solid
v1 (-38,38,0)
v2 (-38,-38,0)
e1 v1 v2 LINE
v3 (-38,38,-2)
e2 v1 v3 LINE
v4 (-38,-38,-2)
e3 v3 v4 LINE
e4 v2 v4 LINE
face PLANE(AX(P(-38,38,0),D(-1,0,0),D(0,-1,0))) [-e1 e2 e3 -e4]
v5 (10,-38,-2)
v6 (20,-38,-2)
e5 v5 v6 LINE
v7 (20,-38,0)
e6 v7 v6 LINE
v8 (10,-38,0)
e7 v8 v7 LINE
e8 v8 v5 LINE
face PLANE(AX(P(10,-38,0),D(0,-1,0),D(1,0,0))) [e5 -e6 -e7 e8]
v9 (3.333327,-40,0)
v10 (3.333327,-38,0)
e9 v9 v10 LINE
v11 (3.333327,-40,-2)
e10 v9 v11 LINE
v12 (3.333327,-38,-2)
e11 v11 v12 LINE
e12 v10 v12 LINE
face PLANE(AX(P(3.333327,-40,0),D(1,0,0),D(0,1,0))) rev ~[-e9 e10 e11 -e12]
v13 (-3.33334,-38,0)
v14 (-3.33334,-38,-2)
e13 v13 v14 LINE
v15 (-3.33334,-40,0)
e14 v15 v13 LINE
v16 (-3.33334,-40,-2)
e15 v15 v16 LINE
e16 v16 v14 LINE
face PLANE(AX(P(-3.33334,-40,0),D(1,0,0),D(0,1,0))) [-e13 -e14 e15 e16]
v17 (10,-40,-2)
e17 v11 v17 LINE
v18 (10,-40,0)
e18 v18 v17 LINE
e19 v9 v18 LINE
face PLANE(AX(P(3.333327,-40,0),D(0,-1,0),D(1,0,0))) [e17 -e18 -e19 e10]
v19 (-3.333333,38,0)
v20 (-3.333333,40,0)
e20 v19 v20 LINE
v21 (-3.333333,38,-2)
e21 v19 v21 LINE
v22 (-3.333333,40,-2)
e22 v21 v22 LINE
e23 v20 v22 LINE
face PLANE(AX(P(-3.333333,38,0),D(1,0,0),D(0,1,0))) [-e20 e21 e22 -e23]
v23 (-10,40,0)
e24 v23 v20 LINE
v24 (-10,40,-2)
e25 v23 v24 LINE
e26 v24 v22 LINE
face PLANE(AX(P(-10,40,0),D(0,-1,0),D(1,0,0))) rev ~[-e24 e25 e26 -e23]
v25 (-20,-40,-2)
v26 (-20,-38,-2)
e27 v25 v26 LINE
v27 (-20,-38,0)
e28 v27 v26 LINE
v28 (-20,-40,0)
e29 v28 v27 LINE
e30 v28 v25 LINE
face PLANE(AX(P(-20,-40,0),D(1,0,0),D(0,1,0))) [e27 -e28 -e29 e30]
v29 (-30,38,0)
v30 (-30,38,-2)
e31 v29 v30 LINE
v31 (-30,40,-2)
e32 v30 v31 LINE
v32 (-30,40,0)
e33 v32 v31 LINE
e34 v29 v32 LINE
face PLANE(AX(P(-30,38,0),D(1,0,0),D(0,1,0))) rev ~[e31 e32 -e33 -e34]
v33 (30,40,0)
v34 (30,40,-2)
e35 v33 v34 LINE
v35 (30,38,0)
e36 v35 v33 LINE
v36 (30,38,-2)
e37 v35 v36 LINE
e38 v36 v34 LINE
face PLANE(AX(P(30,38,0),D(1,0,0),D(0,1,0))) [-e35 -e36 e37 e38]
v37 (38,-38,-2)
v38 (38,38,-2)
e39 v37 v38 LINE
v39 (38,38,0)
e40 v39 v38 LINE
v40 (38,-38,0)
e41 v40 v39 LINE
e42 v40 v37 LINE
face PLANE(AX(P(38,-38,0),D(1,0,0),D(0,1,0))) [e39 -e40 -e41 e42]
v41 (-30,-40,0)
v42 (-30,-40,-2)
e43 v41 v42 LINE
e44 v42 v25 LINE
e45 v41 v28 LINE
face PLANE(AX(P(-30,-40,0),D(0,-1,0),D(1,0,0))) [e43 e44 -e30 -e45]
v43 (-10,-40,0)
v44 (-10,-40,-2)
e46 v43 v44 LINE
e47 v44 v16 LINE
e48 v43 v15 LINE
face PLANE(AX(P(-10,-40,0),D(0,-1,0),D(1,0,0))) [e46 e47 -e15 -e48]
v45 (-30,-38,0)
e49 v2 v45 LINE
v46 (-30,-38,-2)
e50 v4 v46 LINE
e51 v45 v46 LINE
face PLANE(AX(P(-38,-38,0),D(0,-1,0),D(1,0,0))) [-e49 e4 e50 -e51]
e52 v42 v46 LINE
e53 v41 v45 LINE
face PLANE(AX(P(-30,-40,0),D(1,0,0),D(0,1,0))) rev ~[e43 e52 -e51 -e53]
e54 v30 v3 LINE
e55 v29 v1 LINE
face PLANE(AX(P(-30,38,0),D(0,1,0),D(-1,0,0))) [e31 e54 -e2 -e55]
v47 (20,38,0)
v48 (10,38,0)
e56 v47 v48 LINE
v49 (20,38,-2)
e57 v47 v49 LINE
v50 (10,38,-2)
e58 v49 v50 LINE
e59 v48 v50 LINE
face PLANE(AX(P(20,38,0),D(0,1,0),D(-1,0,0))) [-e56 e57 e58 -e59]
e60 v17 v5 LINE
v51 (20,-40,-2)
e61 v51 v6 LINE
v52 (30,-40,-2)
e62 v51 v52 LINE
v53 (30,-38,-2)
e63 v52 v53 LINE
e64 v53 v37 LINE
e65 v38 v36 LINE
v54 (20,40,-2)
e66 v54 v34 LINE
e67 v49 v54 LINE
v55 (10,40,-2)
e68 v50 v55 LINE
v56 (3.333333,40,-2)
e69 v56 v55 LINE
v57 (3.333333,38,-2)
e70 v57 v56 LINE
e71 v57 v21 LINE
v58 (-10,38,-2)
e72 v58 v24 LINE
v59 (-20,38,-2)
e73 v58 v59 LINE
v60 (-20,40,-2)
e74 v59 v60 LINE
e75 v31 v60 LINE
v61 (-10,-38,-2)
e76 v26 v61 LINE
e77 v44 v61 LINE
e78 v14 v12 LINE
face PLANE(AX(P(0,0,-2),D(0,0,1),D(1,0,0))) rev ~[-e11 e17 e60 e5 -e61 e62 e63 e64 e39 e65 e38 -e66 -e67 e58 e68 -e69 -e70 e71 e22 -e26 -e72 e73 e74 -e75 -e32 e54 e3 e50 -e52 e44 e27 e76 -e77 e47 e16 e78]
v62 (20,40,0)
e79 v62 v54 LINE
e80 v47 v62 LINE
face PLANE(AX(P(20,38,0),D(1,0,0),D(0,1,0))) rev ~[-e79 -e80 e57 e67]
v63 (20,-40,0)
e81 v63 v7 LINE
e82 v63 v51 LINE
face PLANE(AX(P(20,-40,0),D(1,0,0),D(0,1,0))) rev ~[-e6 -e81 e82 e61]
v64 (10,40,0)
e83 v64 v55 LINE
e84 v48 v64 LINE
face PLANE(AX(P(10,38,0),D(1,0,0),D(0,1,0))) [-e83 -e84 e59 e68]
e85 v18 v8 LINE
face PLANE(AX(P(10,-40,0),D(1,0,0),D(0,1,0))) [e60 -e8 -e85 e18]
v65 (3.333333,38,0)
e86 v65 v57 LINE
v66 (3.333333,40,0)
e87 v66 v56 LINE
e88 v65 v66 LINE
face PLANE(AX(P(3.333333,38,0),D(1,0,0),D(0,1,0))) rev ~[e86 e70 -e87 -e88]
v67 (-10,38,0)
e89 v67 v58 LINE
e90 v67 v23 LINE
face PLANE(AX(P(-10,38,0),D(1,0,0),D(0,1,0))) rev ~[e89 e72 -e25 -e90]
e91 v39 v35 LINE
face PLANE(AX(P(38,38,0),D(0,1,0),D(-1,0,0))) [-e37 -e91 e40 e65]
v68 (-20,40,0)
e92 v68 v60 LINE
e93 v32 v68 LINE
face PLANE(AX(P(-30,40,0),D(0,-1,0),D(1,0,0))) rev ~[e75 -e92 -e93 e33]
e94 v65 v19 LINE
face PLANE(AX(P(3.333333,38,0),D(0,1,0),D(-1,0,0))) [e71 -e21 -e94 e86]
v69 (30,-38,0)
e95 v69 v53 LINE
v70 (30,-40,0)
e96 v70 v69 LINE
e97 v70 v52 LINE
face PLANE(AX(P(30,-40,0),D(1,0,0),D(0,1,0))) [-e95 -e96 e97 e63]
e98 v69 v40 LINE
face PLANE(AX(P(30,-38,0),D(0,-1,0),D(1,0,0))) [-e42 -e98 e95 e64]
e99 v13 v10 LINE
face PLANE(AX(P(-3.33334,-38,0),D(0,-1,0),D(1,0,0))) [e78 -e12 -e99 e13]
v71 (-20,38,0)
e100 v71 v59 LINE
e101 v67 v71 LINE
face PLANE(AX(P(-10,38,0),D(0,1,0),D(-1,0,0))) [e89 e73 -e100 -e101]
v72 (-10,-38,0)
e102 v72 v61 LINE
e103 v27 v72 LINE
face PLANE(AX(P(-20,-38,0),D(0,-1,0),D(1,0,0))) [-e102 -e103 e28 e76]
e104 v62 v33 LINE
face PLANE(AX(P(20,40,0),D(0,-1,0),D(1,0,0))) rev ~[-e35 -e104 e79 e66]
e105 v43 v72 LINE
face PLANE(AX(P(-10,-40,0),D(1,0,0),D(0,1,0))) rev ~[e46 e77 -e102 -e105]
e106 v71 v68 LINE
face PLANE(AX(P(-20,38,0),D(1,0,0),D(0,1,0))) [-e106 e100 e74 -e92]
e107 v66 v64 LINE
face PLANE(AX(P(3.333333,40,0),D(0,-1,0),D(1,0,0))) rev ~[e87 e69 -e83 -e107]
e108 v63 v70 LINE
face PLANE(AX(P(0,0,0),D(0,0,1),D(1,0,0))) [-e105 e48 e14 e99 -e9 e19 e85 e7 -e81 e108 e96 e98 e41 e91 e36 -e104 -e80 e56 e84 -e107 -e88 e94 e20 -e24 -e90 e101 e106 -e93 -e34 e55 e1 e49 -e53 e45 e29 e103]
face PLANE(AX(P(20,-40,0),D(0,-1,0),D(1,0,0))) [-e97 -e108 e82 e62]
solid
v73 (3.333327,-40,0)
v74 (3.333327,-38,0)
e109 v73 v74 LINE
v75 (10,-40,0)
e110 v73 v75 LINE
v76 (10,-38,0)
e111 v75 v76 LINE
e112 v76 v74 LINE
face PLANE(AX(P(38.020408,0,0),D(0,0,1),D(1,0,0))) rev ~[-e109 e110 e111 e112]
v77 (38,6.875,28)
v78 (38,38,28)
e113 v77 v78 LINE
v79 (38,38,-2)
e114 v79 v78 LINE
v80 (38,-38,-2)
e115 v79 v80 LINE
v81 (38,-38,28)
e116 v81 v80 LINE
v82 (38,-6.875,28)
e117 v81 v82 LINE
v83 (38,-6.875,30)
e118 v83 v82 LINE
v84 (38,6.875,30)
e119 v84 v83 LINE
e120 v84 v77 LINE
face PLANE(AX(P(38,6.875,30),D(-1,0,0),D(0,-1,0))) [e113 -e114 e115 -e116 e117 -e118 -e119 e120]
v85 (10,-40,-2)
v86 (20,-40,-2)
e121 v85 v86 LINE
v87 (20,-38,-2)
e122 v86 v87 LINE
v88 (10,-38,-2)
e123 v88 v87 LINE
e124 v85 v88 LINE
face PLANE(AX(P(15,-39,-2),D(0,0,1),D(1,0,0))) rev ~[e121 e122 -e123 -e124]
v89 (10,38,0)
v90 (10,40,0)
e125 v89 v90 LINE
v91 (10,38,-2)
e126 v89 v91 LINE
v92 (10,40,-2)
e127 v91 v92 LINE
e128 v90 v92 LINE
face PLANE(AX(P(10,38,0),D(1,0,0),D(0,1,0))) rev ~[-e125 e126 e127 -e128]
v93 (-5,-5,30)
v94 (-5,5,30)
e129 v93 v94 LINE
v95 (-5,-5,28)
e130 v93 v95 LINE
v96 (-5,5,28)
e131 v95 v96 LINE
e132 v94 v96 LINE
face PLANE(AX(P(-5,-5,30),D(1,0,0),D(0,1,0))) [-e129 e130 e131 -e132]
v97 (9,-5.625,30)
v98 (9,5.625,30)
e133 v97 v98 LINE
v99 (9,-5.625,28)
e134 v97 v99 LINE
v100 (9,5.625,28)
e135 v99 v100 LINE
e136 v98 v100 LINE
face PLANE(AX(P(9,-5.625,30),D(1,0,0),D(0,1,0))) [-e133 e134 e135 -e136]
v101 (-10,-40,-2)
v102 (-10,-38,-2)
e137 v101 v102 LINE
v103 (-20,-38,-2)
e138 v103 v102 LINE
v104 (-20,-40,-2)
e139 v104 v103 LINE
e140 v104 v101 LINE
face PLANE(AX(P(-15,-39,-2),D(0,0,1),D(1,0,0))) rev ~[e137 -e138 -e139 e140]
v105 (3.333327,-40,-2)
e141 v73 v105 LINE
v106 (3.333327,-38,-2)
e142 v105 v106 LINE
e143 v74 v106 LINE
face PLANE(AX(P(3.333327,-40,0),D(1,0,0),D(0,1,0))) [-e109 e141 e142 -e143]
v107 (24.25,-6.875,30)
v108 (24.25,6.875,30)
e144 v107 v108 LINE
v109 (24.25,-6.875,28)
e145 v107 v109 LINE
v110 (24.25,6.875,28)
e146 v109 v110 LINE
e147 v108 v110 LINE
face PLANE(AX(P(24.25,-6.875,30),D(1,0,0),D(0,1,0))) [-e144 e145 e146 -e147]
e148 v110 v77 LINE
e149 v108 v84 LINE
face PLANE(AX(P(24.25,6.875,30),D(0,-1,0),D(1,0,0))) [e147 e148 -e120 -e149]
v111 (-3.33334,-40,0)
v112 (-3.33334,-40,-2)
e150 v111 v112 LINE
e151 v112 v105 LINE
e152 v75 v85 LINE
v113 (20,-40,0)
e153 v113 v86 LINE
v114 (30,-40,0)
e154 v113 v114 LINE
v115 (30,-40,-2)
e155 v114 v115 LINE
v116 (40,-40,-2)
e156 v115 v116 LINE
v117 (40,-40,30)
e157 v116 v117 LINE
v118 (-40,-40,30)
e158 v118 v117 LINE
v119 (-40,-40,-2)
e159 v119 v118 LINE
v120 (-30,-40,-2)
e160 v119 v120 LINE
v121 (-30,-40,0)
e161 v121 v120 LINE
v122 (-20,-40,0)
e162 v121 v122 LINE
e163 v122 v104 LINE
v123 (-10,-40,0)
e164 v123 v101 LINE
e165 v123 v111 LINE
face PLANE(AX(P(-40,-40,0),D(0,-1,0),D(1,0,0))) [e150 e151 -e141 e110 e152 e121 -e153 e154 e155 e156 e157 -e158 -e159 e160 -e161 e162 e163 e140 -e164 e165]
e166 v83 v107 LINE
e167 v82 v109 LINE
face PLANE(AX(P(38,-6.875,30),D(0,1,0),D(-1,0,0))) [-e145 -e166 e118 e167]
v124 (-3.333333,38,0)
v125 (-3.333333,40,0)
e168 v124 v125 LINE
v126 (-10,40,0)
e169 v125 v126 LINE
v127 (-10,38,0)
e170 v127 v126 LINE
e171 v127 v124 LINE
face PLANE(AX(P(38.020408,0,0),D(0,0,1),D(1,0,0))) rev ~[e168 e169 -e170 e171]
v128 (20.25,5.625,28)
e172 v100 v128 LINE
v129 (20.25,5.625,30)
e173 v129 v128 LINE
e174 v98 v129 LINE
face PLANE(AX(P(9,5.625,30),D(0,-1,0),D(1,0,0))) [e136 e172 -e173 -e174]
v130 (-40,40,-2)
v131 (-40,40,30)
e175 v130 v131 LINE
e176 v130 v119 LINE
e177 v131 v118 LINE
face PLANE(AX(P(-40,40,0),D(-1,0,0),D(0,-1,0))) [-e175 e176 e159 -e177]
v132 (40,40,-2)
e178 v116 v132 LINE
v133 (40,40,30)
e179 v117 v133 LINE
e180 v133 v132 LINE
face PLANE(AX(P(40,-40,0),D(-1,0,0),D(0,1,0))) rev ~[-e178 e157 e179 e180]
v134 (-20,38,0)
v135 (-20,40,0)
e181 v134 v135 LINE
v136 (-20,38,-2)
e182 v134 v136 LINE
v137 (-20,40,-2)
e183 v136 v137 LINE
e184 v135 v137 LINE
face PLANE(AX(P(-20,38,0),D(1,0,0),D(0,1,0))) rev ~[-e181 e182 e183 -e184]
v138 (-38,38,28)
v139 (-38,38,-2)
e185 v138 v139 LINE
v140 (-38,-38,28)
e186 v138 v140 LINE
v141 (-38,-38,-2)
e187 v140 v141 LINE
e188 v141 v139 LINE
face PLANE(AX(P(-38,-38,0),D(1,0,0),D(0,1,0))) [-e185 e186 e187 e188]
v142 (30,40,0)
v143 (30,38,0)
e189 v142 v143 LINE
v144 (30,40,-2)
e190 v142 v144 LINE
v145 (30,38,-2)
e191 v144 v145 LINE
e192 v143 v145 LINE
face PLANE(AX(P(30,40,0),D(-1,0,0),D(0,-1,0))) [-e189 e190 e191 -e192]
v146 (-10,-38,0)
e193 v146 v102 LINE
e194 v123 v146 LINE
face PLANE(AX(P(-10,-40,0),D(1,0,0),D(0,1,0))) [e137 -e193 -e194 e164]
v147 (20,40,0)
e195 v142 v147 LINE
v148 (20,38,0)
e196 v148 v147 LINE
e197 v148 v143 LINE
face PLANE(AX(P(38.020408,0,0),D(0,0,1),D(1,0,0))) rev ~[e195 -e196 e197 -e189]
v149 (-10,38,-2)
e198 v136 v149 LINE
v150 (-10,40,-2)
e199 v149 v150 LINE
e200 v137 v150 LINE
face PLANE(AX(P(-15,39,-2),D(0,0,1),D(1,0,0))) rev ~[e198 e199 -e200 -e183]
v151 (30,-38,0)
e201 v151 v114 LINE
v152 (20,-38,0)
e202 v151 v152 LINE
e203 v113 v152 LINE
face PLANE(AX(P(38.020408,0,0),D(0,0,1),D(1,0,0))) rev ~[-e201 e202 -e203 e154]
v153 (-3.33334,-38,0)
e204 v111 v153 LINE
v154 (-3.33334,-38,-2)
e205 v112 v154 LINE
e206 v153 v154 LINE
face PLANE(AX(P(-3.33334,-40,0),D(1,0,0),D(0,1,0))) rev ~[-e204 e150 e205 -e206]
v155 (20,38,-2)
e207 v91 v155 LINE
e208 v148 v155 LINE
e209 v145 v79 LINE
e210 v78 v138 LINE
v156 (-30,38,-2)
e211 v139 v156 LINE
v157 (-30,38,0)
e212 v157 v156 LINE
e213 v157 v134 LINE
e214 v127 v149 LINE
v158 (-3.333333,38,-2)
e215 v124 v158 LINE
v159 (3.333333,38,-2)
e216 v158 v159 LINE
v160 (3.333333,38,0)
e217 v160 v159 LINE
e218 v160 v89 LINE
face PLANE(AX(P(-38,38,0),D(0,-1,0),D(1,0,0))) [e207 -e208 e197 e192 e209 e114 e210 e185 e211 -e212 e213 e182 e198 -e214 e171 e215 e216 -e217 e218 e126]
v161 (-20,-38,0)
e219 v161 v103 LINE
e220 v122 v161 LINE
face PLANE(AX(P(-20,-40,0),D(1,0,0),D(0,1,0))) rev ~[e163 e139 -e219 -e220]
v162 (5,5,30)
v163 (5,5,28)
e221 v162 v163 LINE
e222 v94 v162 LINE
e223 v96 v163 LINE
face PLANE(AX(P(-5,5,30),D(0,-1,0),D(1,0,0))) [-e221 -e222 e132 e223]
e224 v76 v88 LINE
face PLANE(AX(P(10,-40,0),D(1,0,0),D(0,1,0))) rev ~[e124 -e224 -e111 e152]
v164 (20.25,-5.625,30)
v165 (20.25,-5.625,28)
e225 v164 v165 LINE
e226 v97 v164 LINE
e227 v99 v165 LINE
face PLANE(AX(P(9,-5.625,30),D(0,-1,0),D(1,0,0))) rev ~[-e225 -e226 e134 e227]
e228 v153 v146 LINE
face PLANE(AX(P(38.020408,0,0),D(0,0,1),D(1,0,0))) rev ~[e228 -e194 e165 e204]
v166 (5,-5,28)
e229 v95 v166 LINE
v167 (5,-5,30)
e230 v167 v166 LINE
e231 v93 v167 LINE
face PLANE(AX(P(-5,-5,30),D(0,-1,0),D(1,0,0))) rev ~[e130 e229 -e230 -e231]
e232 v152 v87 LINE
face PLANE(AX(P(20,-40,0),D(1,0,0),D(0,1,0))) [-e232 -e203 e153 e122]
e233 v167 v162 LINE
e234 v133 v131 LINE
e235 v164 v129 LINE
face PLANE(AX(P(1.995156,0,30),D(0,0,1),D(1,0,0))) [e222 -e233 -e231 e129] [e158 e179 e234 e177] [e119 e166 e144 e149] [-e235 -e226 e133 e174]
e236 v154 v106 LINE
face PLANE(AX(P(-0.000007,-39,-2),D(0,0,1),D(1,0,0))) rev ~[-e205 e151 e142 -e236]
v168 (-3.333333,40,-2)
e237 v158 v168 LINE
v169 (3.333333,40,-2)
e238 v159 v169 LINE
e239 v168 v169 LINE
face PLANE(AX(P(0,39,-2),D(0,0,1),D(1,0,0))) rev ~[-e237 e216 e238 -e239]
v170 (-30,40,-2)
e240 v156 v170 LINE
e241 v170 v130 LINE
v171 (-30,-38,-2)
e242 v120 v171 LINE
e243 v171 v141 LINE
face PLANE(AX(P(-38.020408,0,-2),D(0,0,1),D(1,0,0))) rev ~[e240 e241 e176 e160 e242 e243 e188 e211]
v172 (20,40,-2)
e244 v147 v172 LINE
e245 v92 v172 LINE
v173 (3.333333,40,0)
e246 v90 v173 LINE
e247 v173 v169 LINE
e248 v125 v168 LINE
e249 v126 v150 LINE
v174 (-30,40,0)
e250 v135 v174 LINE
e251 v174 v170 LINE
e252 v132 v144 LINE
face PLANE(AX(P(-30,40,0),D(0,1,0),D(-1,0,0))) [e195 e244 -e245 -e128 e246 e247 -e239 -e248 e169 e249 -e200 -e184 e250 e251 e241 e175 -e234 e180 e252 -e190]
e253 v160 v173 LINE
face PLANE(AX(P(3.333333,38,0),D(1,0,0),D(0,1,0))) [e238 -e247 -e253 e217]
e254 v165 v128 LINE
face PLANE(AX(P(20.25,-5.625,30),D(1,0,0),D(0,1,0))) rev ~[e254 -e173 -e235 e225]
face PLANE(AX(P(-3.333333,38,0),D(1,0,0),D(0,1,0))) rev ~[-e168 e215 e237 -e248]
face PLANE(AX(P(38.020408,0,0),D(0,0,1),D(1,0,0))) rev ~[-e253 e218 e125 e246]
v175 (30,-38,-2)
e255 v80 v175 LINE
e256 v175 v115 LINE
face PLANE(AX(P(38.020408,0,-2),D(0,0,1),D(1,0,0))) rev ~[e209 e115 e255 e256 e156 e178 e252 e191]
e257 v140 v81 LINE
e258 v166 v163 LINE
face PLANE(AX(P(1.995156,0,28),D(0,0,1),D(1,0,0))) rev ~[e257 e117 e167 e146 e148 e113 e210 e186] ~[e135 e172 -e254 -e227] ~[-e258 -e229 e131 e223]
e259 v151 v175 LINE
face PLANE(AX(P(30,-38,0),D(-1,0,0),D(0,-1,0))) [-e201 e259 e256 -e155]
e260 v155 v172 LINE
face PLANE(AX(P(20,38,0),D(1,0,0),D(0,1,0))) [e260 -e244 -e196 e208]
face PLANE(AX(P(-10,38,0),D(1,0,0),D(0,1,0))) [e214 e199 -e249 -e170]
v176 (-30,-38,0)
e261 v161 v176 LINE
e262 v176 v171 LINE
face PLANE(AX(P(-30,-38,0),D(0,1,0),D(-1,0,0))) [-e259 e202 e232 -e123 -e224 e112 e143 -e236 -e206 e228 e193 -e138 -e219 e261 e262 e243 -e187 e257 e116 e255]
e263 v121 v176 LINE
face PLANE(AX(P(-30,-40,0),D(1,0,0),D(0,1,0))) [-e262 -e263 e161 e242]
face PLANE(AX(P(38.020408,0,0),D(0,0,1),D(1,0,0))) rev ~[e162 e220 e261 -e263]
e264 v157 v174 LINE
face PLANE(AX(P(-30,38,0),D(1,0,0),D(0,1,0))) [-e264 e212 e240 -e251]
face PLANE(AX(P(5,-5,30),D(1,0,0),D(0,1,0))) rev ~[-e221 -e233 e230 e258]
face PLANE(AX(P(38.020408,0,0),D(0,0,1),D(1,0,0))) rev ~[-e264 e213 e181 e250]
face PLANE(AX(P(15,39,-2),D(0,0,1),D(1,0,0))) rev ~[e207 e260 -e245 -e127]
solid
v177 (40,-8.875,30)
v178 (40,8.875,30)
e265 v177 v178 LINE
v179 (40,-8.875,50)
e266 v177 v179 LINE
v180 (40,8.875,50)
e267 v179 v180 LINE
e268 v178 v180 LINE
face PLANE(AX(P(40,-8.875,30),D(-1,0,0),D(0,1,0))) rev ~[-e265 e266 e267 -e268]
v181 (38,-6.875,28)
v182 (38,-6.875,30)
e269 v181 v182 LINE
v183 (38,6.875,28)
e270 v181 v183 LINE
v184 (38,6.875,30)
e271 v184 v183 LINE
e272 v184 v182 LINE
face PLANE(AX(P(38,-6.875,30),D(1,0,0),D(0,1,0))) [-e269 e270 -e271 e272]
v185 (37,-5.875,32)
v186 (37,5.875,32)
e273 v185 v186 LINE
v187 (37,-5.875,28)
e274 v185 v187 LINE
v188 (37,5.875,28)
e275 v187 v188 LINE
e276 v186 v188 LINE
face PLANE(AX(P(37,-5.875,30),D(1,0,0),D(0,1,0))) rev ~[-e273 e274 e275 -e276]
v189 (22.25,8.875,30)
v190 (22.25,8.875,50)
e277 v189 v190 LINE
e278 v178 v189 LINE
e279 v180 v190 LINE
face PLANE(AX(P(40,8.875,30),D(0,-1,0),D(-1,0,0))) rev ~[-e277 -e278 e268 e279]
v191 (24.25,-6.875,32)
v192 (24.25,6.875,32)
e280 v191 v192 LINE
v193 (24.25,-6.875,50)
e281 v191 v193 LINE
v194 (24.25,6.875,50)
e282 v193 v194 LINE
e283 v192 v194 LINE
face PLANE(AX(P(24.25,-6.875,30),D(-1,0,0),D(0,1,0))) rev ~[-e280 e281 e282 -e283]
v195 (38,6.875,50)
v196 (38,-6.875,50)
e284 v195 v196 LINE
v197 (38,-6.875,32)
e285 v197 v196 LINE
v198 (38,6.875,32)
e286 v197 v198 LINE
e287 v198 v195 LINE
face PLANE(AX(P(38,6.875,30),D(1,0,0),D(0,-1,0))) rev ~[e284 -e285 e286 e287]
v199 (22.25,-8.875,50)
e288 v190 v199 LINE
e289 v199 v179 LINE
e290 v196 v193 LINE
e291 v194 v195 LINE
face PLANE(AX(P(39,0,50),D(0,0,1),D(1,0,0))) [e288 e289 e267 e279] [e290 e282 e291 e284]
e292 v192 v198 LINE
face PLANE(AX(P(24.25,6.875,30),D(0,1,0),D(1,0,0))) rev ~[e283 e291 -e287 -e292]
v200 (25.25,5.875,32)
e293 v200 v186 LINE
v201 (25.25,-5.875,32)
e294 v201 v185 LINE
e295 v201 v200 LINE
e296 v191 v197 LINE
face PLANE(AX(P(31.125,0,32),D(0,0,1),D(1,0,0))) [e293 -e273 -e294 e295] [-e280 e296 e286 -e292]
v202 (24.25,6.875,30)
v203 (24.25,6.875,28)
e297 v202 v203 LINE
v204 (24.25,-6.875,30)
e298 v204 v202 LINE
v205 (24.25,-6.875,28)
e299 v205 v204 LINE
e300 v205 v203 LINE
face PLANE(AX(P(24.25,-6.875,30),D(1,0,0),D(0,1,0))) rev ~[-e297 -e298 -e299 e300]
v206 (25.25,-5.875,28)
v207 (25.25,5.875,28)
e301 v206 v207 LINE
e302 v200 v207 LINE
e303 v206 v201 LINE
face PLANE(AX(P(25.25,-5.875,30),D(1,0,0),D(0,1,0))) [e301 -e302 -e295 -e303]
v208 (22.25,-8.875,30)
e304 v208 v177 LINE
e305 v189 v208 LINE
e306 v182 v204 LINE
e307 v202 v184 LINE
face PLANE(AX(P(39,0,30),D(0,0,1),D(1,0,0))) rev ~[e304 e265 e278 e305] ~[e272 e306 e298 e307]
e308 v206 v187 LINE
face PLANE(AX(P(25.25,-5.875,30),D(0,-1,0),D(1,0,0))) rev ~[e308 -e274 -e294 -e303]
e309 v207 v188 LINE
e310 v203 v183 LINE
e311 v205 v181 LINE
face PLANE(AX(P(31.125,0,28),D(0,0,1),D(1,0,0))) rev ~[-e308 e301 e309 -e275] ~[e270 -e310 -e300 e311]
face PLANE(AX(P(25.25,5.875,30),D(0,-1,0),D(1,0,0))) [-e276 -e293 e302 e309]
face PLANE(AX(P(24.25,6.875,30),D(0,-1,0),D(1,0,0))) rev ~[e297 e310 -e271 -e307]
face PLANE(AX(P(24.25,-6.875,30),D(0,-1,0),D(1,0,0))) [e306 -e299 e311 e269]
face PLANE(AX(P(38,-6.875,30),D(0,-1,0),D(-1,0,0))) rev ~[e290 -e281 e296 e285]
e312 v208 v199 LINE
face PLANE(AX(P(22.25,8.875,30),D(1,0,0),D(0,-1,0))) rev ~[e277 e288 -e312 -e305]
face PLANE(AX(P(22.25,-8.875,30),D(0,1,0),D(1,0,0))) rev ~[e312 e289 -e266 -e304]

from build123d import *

# Parameters (mm, degrees)
F0_W     = 10
F0_H     = 2
F0_W_2   = 6.66666666
F0_W_3   = 6.66667334
F0_W_4   = 6.66666
F0_W_5   = 6.666666666
F0_W_6   = 6.666666674
F1_DEPTH = 30
F2_W     = 10
F2_H     = 10
F2_W_2   = 11.25
F2_H_2   = 11.25
F3_DEPTH = 2
F4_DEPTH = 20
F5_DEPTH = 2
F2_W_3   = 13.75
F2_H_3   = 13.75
F2_W_4   = 11.75
F2_H_4   = 11.75
F6_DEPTH = 2
F7_DEPTH = 2


# Not quite as in the source:
# - a feature names something its author has since deleted; it is built from what else it names


with BuildPart() as f1:
    # F0 (on Top) → F1 (new body)
    with BuildSketch(Plane.XY):
        Polygon((30, 38), (38, 38), (38, -38), (30, -38), (30, -40), (40, -40), (40, -38), (40, 40), (30, 40), align=None)
        Polygon((-38, 38), (-30, 38), (-30, 40), (-40, 40), (-40, -40), (-30, -40), (-30, -38), (-38, -38), align=None)
        with Locations((-25, 39)):
            Rectangle(F0_W, F0_H)
        with Locations((-15, 39)):
            Rectangle(F0_W, F0_H)
        with Locations((-6.66666667, 39)):
            Rectangle(F0_W_2, F0_H)
        with Locations((15, 39)):
            Rectangle(F0_W, F0_H)
        with Locations((25, 39)):
            Rectangle(F0_W, F0_H)
        with Locations((25, -39)):
            Rectangle(F0_W, F0_H)
        with Locations((15, -39)):
            Rectangle(F0_W, F0_H)
        with Locations((6.66666333, -39)):
            Rectangle(F0_W_3, F0_H)
        with Locations((-6.66667, -39)):
            Rectangle(F0_W_4, F0_H)
        with Locations((-15, -39)):
            Rectangle(F0_W, F0_H)
        with Locations((-25, -39)):
            Rectangle(F0_W, F0_H)
        with Locations((-7e-09, 39)):
            Rectangle(F0_W_5, F0_H)
        with Locations((6.666666663, 39)):
            Rectangle(F0_W_6, F0_H)
        with Locations((-6.67e-06, -39)):
            Rectangle(F0_W_2, F0_H)
    extrude(amount=F1_DEPTH)

    # F2 (on face) → F3 (join)
    with BuildSketch(Plane.XY.offset(30)):
        Polygon((22.25, 8.875), (38, 8.875), (38, 38), (-38, 38), (-38, -38), (38, -38), (38, -8.875), (22.25, -8.875), align=None)
        Rectangle(F2_W, F2_H, mode=Mode.SUBTRACT)
        with Locations((14.625, 0)):
            Rectangle(F2_W_2, F2_H_2, mode=Mode.SUBTRACT)
        Polygon((40, -8.875), (40, 8.875), (38, 8.875), (38, 6.875), (38, -6.875), (38, -8.875), align=None)
        Polygon((38, 6.875), (38, 8.875), (22.25, 8.875), (22.25, -8.875), (38, -8.875), (38, -6.875), (24.25, -6.875), (24.25, 6.875), align=None)
    extrude(amount=-F3_DEPTH)

    # F0 (on Top) → F7 (join)
    with BuildSketch(Plane.XY):
        Polygon((-38, 38), (-30, 38), (-30, 40), (-40, 40), (-40, -40), (-30, -40), (-30, -38), (-38, -38), align=None)
        with Locations((-15, 39)):
            Rectangle(F0_W, F0_H)
        with Locations((-7e-09, 39)):
            Rectangle(F0_W_5, F0_H)
        with Locations((15, 39)):
            Rectangle(F0_W, F0_H)
        Polygon((30, 38), (38, 38), (38, -38), (30, -38), (30, -40), (40, -40), (40, -38), (40, 40), (30, 40), align=None)
        with Locations((15, -39)):
            Rectangle(F0_W, F0_H)
        with Locations((-6.67e-06, -39)):
            Rectangle(F0_W_2, F0_H)
        with Locations((-15, -39)):
            Rectangle(F0_W, F0_H)
    extrude(amount=-F7_DEPTH)


with BuildPart() as f4:
    # F2 (on face) → F4 (new body)
    with BuildSketch(Plane.XY.offset(30)):
        Polygon((40, -8.875), (40, 8.875), (38, 8.875), (38, 6.875), (38, -6.875), (38, -8.875), align=None)
        Polygon((38, 6.875), (38, 8.875), (22.25, 8.875), (22.25, -8.875), (38, -8.875), (38, -6.875), (24.25, -6.875), (24.25, 6.875), align=None)
    extrude(amount=F4_DEPTH)

    # F2 (on face) → F6 (join, symmetric)
    with BuildSketch(Plane.XY.offset(30)):
        with Locations((31.125, 0)):
            Rectangle(F2_W_3, F2_H_3)
        with Locations((31.125, 0)):
            Rectangle(F2_W_4, F2_H_4, mode=Mode.SUBTRACT)
    extrude(amount=F6_DEPTH, both=True)


with BuildPart() as f5:
    # F0 (on Top) → F5 (new body)
    with BuildSketch(Plane.XY):
        Polygon((38, -38), (38, 38), (30, 38), (20, 38), (10, 38), (3.333333326, 38), (-3.33333334, 38), (-10, 38), (-20, 38), (-30, 38), (-38, 38), (-38, -38), (-30, -38), (-20, -38), (-10, -38), (-3.33334, -38), (3.33332666, -38), (10, -38), (20, -38), (30, -38), align=None)
        with Locations((-25, 39)):
            Rectangle(F0_W, F0_H)
        with Locations((25, 39)):
            Rectangle(F0_W, F0_H)
        with Locations((-6.66667, -39)):
            Rectangle(F0_W_4, F0_H)
        with Locations((-25, -39)):
            Rectangle(F0_W, F0_H)
        with Locations((6.66666333, -39)):
            Rectangle(F0_W_3, F0_H)
        with Locations((25, -39)):
            Rectangle(F0_W, F0_H)
        with Locations((-6.66666667, 39)):
            Rectangle(F0_W_2, F0_H)
        with Locations((6.666666663, 39)):
            Rectangle(F0_W_6, F0_H)
    extrude(amount=-F5_DEPTH)


solid = Compound([f1.part, f4.part, f5.part])
